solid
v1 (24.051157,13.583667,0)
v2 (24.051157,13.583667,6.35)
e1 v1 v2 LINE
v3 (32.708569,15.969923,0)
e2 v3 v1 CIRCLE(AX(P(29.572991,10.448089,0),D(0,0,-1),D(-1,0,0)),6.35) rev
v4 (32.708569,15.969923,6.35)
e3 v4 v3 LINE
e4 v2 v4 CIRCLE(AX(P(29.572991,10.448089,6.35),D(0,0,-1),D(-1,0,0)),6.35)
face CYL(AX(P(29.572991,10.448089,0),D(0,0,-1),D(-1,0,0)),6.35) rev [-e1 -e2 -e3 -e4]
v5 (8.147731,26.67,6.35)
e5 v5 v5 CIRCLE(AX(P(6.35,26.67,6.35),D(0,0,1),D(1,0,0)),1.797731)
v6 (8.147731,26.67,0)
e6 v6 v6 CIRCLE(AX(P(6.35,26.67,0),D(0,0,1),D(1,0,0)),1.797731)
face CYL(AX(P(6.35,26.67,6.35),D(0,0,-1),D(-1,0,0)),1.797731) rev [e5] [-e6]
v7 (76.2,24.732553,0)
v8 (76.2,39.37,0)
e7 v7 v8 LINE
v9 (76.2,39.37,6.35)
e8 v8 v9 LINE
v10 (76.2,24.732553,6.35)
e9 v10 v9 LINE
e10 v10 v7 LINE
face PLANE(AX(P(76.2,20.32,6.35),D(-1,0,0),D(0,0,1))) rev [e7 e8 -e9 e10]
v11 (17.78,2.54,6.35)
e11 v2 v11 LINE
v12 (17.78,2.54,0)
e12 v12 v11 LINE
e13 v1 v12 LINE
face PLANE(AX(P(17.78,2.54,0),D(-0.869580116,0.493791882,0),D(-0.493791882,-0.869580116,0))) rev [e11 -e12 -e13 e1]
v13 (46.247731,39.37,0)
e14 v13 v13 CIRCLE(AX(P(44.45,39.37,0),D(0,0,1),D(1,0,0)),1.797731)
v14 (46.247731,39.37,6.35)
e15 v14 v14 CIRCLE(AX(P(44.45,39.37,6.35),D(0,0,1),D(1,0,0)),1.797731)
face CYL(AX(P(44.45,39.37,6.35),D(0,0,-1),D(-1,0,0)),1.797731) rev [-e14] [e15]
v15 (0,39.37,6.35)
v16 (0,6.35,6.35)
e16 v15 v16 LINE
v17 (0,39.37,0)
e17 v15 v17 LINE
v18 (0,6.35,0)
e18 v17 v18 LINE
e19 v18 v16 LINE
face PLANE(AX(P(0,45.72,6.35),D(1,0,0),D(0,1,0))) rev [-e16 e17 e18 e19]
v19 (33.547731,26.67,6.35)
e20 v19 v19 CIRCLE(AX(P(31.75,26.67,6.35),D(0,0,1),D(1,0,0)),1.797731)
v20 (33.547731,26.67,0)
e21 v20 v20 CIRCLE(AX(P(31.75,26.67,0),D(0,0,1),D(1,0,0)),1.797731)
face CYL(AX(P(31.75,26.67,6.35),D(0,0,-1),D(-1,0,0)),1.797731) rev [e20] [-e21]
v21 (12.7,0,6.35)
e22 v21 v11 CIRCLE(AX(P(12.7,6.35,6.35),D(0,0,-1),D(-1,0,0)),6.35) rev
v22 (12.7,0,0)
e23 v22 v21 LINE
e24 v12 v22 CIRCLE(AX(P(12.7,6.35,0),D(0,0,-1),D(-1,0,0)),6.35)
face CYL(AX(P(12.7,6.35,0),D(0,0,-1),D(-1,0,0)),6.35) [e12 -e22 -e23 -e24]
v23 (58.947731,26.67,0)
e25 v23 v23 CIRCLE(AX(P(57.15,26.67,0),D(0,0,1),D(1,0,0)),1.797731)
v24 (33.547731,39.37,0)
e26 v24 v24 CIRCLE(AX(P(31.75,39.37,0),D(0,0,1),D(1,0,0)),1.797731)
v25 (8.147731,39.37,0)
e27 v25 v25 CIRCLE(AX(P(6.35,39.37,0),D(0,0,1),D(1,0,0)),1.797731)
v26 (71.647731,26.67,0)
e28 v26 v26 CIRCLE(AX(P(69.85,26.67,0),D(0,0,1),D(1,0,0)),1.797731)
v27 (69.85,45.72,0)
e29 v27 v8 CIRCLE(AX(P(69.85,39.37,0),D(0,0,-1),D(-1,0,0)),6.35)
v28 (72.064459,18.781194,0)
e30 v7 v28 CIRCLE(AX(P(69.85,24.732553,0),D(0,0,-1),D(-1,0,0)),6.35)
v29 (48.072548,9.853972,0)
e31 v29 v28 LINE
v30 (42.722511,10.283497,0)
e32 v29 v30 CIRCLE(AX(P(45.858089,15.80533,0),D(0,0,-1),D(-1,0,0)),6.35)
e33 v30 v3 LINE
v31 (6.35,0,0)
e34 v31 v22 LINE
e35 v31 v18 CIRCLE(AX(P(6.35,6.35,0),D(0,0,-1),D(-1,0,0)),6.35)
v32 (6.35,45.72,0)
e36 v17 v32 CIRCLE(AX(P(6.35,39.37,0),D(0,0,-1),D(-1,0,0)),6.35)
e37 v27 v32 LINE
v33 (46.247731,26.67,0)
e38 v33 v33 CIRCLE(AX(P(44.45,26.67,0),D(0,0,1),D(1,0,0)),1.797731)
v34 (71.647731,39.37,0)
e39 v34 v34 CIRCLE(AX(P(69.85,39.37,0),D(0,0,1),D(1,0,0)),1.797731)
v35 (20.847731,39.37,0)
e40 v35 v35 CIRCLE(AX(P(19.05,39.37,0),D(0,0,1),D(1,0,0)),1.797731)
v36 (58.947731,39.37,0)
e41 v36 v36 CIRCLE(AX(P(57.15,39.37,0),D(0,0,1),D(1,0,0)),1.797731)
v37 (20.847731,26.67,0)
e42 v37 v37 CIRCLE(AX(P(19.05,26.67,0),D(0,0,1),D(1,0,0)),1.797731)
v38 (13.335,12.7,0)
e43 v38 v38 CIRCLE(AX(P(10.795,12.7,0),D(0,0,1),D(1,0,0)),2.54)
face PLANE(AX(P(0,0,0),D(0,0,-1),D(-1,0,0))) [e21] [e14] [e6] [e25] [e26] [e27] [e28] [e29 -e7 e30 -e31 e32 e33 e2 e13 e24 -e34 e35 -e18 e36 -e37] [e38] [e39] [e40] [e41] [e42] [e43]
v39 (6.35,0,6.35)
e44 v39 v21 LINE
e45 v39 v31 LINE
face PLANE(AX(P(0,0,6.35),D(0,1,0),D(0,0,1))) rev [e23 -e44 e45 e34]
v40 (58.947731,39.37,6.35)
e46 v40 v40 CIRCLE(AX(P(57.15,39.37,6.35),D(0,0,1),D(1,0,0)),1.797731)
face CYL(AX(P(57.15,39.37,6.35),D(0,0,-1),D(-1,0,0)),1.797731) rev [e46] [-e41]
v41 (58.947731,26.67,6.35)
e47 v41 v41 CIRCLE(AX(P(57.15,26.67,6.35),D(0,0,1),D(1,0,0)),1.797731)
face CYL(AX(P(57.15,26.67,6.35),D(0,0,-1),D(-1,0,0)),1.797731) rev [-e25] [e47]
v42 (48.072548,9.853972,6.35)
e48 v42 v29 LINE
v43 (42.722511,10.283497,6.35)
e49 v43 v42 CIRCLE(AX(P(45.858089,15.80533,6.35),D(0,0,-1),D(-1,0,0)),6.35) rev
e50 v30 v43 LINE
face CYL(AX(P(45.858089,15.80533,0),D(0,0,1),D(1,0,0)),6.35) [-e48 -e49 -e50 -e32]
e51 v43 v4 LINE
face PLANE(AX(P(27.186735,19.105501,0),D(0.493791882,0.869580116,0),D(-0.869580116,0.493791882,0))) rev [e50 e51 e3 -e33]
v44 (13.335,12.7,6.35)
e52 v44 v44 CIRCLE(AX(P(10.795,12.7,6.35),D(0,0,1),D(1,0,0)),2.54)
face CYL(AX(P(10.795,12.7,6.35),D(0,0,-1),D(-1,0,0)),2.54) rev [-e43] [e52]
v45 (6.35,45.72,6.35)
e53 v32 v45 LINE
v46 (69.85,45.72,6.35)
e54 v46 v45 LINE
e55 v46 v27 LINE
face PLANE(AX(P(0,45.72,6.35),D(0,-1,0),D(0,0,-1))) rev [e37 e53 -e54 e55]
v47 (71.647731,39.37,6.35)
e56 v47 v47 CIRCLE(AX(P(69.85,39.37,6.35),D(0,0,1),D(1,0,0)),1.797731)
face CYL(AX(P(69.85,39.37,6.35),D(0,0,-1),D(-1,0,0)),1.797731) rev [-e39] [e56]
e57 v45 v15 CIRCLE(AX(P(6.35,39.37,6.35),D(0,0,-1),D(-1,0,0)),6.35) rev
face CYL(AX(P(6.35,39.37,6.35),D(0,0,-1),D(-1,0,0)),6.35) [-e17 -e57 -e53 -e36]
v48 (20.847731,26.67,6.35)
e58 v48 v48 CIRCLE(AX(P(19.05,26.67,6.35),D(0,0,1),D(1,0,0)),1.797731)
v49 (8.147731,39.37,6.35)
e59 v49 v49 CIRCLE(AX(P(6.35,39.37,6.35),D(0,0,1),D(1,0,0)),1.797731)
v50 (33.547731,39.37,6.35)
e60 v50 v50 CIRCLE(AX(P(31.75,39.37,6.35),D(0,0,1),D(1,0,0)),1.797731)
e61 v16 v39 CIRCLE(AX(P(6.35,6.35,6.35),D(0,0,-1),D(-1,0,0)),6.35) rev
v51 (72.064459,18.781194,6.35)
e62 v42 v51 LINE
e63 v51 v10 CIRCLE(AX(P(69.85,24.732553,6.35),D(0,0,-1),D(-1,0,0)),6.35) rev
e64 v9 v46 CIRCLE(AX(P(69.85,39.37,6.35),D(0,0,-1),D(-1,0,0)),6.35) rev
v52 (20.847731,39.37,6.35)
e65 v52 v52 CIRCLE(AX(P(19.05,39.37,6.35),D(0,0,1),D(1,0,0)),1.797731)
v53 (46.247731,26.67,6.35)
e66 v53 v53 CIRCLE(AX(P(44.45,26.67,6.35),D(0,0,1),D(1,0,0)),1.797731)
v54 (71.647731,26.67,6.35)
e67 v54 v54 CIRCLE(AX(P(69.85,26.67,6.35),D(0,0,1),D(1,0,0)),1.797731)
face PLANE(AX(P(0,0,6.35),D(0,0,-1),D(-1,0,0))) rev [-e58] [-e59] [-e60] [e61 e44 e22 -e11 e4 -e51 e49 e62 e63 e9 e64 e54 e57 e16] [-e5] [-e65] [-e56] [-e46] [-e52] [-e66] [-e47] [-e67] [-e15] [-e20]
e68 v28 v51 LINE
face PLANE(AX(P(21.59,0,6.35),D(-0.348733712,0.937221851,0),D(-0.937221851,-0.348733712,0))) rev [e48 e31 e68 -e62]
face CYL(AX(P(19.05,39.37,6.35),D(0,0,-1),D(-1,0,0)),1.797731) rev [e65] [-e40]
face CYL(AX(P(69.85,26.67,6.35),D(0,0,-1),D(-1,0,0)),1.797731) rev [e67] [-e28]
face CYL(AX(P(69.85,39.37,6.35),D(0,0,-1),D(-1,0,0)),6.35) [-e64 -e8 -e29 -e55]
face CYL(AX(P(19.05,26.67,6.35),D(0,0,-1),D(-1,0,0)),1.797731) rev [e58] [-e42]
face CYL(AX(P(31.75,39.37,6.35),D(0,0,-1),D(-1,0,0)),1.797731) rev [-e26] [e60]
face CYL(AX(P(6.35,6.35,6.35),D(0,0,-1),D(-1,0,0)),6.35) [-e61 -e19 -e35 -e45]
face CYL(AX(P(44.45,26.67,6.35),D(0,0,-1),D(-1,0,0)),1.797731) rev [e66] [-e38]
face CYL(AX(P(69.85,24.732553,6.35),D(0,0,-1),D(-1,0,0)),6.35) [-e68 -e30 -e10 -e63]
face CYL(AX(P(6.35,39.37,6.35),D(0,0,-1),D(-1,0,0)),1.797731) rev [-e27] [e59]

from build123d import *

# Parameters (mm, degrees)
SKETCH1_R           = 2.54
SKETCH1_R_2         = 1.797730585
BOSS_EXTRUDE1_DEPTH = 6.35
CUT_EXTRUDE1_DEPTH  = 90.090296329
FILLET1_R           = 6.35


with BuildPart() as part:
    # Sketch1 → Boss-Extrude1 (new body)
    with BuildSketch(Plane.XY):
        Polygon((21.59, 0), (76.2, 20.32), (76.2, 45.72), (0, 45.72), (0, 0), align=None)
        with Locations((10.795, 12.7)):
            Circle(SKETCH1_R, mode=Mode.SUBTRACT)
        with Locations((69.85, 39.37)):
            Circle(SKETCH1_R_2, mode=Mode.SUBTRACT)
        with Locations((57.15, 39.37)):
            Circle(SKETCH1_R_2, mode=Mode.SUBTRACT)
        with Locations((44.45, 39.37)):
            Circle(SKETCH1_R_2, mode=Mode.SUBTRACT)
        with Locations((31.75, 39.37)):
            Circle(SKETCH1_R_2, mode=Mode.SUBTRACT)
        with Locations((19.05, 39.37)):
            Circle(SKETCH1_R_2, mode=Mode.SUBTRACT)
        with Locations((6.35, 39.37)):
            Circle(SKETCH1_R_2, mode=Mode.SUBTRACT)
        with Locations((57.15, 26.67)):
            Circle(SKETCH1_R_2, mode=Mode.SUBTRACT)
        with Locations((44.45, 26.67)):
            Circle(SKETCH1_R_2, mode=Mode.SUBTRACT)
        with Locations((31.75, 26.67)):
            Circle(SKETCH1_R_2, mode=Mode.SUBTRACT)
        with Locations((19.05, 26.67)):
            Circle(SKETCH1_R_2, mode=Mode.SUBTRACT)
        with Locations((6.35, 26.67)):
            Circle(SKETCH1_R_2, mode=Mode.SUBTRACT)
        with Locations((69.85, 26.67)):
            Circle(SKETCH1_R_2, mode=Mode.SUBTRACT)
    extrude(amount=BOSS_EXTRUDE1_DEPTH)

    # Sketch2 → Cut-Extrude1 (cut, through all)
    with BuildSketch(Plane.XY.offset(6.35)):
        Polygon((17.78, 0), (17.78, 2.54), (27.186735348, 19.105501202), (45.29738426, 8.821352283), (21.59, 0), align=None)
    extrude(amount=-CUT_EXTRUDE1_DEPTH, mode=Mode.SUBTRACT)

    # Fillet1
    # the kernel refuses this fillet: 6.35 mm, written as the material it adds along each edge
    with BuildSketch(Plane(origin=(27.186735348, 19.105501202, 6.35), x_dir=(0.8695801156095444, -0.4937918818049677, 0), z_dir=(0, 0, -1))) as fillet1_piece_1:
        with BuildLine():
            CenterArc((FILLET1_R, FILLET1_R), FILLET1_R, 180, 90)
            Line((0, FILLET1_R), (0, 0))
            Line((0, 0), (FILLET1_R, 0))
        make_face()
    extrude(amount=6.35)
    # the kernel refuses this fillet: 6.35 mm, written as the material it takes off along each edge
    with BuildSketch(Plane(origin=(45.29738426, 8.821352283, 13.752634073), x_dir=(0.9372218510575621, 0.3487337120214175, 0), z_dir=(0, 0, -1))) as fillet1_2_piece_1:
        with BuildLine():
            CenterArc((FILLET1_R * 0.466307658155, -FILLET1_R), FILLET1_R, 90, 50)
            Line((-FILLET1_R * 0.299736784964, -FILLET1_R * 0.357212390313), (0, 0))
            Line((0, 0), (FILLET1_R * 0.466307658155, 0))
        make_face()
    extrude(amount=21.155268146, mode=Mode.SUBTRACT)
    with BuildSketch(Plane(origin=(76.2, 20.32, -11.031382068), x_dir=(-0.9372218510575616, -0.34873371202141845, 0), z_dir=(0, 0, 1))) as fillet1_2_piece_2:
        with BuildLine():
            CenterArc((FILLET1_R * 0.694890209019, -FILLET1_R), FILLET1_R, 90, 69.590117166)
            Line((-FILLET1_R * 0.242331642039, -FILLET1_R * 0.651266287979), (0, 0))
            Line((0, 0), (FILLET1_R * 0.694890209019, 0))
        make_face()
    extrude(amount=28.412764136, mode=Mode.SUBTRACT)
    with BuildSketch(Plane(origin=(76.2, 45.72, -15.875), x_dir=(0, -1, 0), z_dir=(0, 0, 1))) as fillet1_2_piece_3:
        with BuildLine():
            CenterArc((FILLET1_R, -FILLET1_R), FILLET1_R, 90, 90)
            Line((0, -FILLET1_R), (0, 0))
            Line((0, 0), (FILLET1_R, 0))
        make_face()
    extrude(amount=38.1, mode=Mode.SUBTRACT)
    with BuildSketch(Plane(origin=(0, 45.72, -15.875), x_dir=(0, -1, 0), z_dir=(0, 0, 1)), Plane(origin=(0, 0, -15.875), x_dir=(1, 0, 0), z_dir=(0, 0, 1))) as fillet1_2_piece_4:
        with BuildLine():
            CenterArc((FILLET1_R, FILLET1_R), FILLET1_R, 180, 90)
            Line((0, FILLET1_R), (0, 0))
            Line((0, 0), (FILLET1_R, 0))
        make_face()
    extrude(amount=38.1, mode=Mode.SUBTRACT)
    with BuildSketch(Plane(origin=(17.78, 0, 19.05), x_dir=(0, 1, 0), z_dir=(0, 0, -1))) as fillet1_2_piece_5:
        with BuildLine():
            CenterArc((6.35, -5.08), FILLET1_R, 126.869897646, 53.130102354)
            Line((0, -5.08), (0, 0))
            Line((0, 0), (2.54, 0))
        make_face()
    extrude(amount=31.75, mode=Mode.SUBTRACT)


solid = part.part
